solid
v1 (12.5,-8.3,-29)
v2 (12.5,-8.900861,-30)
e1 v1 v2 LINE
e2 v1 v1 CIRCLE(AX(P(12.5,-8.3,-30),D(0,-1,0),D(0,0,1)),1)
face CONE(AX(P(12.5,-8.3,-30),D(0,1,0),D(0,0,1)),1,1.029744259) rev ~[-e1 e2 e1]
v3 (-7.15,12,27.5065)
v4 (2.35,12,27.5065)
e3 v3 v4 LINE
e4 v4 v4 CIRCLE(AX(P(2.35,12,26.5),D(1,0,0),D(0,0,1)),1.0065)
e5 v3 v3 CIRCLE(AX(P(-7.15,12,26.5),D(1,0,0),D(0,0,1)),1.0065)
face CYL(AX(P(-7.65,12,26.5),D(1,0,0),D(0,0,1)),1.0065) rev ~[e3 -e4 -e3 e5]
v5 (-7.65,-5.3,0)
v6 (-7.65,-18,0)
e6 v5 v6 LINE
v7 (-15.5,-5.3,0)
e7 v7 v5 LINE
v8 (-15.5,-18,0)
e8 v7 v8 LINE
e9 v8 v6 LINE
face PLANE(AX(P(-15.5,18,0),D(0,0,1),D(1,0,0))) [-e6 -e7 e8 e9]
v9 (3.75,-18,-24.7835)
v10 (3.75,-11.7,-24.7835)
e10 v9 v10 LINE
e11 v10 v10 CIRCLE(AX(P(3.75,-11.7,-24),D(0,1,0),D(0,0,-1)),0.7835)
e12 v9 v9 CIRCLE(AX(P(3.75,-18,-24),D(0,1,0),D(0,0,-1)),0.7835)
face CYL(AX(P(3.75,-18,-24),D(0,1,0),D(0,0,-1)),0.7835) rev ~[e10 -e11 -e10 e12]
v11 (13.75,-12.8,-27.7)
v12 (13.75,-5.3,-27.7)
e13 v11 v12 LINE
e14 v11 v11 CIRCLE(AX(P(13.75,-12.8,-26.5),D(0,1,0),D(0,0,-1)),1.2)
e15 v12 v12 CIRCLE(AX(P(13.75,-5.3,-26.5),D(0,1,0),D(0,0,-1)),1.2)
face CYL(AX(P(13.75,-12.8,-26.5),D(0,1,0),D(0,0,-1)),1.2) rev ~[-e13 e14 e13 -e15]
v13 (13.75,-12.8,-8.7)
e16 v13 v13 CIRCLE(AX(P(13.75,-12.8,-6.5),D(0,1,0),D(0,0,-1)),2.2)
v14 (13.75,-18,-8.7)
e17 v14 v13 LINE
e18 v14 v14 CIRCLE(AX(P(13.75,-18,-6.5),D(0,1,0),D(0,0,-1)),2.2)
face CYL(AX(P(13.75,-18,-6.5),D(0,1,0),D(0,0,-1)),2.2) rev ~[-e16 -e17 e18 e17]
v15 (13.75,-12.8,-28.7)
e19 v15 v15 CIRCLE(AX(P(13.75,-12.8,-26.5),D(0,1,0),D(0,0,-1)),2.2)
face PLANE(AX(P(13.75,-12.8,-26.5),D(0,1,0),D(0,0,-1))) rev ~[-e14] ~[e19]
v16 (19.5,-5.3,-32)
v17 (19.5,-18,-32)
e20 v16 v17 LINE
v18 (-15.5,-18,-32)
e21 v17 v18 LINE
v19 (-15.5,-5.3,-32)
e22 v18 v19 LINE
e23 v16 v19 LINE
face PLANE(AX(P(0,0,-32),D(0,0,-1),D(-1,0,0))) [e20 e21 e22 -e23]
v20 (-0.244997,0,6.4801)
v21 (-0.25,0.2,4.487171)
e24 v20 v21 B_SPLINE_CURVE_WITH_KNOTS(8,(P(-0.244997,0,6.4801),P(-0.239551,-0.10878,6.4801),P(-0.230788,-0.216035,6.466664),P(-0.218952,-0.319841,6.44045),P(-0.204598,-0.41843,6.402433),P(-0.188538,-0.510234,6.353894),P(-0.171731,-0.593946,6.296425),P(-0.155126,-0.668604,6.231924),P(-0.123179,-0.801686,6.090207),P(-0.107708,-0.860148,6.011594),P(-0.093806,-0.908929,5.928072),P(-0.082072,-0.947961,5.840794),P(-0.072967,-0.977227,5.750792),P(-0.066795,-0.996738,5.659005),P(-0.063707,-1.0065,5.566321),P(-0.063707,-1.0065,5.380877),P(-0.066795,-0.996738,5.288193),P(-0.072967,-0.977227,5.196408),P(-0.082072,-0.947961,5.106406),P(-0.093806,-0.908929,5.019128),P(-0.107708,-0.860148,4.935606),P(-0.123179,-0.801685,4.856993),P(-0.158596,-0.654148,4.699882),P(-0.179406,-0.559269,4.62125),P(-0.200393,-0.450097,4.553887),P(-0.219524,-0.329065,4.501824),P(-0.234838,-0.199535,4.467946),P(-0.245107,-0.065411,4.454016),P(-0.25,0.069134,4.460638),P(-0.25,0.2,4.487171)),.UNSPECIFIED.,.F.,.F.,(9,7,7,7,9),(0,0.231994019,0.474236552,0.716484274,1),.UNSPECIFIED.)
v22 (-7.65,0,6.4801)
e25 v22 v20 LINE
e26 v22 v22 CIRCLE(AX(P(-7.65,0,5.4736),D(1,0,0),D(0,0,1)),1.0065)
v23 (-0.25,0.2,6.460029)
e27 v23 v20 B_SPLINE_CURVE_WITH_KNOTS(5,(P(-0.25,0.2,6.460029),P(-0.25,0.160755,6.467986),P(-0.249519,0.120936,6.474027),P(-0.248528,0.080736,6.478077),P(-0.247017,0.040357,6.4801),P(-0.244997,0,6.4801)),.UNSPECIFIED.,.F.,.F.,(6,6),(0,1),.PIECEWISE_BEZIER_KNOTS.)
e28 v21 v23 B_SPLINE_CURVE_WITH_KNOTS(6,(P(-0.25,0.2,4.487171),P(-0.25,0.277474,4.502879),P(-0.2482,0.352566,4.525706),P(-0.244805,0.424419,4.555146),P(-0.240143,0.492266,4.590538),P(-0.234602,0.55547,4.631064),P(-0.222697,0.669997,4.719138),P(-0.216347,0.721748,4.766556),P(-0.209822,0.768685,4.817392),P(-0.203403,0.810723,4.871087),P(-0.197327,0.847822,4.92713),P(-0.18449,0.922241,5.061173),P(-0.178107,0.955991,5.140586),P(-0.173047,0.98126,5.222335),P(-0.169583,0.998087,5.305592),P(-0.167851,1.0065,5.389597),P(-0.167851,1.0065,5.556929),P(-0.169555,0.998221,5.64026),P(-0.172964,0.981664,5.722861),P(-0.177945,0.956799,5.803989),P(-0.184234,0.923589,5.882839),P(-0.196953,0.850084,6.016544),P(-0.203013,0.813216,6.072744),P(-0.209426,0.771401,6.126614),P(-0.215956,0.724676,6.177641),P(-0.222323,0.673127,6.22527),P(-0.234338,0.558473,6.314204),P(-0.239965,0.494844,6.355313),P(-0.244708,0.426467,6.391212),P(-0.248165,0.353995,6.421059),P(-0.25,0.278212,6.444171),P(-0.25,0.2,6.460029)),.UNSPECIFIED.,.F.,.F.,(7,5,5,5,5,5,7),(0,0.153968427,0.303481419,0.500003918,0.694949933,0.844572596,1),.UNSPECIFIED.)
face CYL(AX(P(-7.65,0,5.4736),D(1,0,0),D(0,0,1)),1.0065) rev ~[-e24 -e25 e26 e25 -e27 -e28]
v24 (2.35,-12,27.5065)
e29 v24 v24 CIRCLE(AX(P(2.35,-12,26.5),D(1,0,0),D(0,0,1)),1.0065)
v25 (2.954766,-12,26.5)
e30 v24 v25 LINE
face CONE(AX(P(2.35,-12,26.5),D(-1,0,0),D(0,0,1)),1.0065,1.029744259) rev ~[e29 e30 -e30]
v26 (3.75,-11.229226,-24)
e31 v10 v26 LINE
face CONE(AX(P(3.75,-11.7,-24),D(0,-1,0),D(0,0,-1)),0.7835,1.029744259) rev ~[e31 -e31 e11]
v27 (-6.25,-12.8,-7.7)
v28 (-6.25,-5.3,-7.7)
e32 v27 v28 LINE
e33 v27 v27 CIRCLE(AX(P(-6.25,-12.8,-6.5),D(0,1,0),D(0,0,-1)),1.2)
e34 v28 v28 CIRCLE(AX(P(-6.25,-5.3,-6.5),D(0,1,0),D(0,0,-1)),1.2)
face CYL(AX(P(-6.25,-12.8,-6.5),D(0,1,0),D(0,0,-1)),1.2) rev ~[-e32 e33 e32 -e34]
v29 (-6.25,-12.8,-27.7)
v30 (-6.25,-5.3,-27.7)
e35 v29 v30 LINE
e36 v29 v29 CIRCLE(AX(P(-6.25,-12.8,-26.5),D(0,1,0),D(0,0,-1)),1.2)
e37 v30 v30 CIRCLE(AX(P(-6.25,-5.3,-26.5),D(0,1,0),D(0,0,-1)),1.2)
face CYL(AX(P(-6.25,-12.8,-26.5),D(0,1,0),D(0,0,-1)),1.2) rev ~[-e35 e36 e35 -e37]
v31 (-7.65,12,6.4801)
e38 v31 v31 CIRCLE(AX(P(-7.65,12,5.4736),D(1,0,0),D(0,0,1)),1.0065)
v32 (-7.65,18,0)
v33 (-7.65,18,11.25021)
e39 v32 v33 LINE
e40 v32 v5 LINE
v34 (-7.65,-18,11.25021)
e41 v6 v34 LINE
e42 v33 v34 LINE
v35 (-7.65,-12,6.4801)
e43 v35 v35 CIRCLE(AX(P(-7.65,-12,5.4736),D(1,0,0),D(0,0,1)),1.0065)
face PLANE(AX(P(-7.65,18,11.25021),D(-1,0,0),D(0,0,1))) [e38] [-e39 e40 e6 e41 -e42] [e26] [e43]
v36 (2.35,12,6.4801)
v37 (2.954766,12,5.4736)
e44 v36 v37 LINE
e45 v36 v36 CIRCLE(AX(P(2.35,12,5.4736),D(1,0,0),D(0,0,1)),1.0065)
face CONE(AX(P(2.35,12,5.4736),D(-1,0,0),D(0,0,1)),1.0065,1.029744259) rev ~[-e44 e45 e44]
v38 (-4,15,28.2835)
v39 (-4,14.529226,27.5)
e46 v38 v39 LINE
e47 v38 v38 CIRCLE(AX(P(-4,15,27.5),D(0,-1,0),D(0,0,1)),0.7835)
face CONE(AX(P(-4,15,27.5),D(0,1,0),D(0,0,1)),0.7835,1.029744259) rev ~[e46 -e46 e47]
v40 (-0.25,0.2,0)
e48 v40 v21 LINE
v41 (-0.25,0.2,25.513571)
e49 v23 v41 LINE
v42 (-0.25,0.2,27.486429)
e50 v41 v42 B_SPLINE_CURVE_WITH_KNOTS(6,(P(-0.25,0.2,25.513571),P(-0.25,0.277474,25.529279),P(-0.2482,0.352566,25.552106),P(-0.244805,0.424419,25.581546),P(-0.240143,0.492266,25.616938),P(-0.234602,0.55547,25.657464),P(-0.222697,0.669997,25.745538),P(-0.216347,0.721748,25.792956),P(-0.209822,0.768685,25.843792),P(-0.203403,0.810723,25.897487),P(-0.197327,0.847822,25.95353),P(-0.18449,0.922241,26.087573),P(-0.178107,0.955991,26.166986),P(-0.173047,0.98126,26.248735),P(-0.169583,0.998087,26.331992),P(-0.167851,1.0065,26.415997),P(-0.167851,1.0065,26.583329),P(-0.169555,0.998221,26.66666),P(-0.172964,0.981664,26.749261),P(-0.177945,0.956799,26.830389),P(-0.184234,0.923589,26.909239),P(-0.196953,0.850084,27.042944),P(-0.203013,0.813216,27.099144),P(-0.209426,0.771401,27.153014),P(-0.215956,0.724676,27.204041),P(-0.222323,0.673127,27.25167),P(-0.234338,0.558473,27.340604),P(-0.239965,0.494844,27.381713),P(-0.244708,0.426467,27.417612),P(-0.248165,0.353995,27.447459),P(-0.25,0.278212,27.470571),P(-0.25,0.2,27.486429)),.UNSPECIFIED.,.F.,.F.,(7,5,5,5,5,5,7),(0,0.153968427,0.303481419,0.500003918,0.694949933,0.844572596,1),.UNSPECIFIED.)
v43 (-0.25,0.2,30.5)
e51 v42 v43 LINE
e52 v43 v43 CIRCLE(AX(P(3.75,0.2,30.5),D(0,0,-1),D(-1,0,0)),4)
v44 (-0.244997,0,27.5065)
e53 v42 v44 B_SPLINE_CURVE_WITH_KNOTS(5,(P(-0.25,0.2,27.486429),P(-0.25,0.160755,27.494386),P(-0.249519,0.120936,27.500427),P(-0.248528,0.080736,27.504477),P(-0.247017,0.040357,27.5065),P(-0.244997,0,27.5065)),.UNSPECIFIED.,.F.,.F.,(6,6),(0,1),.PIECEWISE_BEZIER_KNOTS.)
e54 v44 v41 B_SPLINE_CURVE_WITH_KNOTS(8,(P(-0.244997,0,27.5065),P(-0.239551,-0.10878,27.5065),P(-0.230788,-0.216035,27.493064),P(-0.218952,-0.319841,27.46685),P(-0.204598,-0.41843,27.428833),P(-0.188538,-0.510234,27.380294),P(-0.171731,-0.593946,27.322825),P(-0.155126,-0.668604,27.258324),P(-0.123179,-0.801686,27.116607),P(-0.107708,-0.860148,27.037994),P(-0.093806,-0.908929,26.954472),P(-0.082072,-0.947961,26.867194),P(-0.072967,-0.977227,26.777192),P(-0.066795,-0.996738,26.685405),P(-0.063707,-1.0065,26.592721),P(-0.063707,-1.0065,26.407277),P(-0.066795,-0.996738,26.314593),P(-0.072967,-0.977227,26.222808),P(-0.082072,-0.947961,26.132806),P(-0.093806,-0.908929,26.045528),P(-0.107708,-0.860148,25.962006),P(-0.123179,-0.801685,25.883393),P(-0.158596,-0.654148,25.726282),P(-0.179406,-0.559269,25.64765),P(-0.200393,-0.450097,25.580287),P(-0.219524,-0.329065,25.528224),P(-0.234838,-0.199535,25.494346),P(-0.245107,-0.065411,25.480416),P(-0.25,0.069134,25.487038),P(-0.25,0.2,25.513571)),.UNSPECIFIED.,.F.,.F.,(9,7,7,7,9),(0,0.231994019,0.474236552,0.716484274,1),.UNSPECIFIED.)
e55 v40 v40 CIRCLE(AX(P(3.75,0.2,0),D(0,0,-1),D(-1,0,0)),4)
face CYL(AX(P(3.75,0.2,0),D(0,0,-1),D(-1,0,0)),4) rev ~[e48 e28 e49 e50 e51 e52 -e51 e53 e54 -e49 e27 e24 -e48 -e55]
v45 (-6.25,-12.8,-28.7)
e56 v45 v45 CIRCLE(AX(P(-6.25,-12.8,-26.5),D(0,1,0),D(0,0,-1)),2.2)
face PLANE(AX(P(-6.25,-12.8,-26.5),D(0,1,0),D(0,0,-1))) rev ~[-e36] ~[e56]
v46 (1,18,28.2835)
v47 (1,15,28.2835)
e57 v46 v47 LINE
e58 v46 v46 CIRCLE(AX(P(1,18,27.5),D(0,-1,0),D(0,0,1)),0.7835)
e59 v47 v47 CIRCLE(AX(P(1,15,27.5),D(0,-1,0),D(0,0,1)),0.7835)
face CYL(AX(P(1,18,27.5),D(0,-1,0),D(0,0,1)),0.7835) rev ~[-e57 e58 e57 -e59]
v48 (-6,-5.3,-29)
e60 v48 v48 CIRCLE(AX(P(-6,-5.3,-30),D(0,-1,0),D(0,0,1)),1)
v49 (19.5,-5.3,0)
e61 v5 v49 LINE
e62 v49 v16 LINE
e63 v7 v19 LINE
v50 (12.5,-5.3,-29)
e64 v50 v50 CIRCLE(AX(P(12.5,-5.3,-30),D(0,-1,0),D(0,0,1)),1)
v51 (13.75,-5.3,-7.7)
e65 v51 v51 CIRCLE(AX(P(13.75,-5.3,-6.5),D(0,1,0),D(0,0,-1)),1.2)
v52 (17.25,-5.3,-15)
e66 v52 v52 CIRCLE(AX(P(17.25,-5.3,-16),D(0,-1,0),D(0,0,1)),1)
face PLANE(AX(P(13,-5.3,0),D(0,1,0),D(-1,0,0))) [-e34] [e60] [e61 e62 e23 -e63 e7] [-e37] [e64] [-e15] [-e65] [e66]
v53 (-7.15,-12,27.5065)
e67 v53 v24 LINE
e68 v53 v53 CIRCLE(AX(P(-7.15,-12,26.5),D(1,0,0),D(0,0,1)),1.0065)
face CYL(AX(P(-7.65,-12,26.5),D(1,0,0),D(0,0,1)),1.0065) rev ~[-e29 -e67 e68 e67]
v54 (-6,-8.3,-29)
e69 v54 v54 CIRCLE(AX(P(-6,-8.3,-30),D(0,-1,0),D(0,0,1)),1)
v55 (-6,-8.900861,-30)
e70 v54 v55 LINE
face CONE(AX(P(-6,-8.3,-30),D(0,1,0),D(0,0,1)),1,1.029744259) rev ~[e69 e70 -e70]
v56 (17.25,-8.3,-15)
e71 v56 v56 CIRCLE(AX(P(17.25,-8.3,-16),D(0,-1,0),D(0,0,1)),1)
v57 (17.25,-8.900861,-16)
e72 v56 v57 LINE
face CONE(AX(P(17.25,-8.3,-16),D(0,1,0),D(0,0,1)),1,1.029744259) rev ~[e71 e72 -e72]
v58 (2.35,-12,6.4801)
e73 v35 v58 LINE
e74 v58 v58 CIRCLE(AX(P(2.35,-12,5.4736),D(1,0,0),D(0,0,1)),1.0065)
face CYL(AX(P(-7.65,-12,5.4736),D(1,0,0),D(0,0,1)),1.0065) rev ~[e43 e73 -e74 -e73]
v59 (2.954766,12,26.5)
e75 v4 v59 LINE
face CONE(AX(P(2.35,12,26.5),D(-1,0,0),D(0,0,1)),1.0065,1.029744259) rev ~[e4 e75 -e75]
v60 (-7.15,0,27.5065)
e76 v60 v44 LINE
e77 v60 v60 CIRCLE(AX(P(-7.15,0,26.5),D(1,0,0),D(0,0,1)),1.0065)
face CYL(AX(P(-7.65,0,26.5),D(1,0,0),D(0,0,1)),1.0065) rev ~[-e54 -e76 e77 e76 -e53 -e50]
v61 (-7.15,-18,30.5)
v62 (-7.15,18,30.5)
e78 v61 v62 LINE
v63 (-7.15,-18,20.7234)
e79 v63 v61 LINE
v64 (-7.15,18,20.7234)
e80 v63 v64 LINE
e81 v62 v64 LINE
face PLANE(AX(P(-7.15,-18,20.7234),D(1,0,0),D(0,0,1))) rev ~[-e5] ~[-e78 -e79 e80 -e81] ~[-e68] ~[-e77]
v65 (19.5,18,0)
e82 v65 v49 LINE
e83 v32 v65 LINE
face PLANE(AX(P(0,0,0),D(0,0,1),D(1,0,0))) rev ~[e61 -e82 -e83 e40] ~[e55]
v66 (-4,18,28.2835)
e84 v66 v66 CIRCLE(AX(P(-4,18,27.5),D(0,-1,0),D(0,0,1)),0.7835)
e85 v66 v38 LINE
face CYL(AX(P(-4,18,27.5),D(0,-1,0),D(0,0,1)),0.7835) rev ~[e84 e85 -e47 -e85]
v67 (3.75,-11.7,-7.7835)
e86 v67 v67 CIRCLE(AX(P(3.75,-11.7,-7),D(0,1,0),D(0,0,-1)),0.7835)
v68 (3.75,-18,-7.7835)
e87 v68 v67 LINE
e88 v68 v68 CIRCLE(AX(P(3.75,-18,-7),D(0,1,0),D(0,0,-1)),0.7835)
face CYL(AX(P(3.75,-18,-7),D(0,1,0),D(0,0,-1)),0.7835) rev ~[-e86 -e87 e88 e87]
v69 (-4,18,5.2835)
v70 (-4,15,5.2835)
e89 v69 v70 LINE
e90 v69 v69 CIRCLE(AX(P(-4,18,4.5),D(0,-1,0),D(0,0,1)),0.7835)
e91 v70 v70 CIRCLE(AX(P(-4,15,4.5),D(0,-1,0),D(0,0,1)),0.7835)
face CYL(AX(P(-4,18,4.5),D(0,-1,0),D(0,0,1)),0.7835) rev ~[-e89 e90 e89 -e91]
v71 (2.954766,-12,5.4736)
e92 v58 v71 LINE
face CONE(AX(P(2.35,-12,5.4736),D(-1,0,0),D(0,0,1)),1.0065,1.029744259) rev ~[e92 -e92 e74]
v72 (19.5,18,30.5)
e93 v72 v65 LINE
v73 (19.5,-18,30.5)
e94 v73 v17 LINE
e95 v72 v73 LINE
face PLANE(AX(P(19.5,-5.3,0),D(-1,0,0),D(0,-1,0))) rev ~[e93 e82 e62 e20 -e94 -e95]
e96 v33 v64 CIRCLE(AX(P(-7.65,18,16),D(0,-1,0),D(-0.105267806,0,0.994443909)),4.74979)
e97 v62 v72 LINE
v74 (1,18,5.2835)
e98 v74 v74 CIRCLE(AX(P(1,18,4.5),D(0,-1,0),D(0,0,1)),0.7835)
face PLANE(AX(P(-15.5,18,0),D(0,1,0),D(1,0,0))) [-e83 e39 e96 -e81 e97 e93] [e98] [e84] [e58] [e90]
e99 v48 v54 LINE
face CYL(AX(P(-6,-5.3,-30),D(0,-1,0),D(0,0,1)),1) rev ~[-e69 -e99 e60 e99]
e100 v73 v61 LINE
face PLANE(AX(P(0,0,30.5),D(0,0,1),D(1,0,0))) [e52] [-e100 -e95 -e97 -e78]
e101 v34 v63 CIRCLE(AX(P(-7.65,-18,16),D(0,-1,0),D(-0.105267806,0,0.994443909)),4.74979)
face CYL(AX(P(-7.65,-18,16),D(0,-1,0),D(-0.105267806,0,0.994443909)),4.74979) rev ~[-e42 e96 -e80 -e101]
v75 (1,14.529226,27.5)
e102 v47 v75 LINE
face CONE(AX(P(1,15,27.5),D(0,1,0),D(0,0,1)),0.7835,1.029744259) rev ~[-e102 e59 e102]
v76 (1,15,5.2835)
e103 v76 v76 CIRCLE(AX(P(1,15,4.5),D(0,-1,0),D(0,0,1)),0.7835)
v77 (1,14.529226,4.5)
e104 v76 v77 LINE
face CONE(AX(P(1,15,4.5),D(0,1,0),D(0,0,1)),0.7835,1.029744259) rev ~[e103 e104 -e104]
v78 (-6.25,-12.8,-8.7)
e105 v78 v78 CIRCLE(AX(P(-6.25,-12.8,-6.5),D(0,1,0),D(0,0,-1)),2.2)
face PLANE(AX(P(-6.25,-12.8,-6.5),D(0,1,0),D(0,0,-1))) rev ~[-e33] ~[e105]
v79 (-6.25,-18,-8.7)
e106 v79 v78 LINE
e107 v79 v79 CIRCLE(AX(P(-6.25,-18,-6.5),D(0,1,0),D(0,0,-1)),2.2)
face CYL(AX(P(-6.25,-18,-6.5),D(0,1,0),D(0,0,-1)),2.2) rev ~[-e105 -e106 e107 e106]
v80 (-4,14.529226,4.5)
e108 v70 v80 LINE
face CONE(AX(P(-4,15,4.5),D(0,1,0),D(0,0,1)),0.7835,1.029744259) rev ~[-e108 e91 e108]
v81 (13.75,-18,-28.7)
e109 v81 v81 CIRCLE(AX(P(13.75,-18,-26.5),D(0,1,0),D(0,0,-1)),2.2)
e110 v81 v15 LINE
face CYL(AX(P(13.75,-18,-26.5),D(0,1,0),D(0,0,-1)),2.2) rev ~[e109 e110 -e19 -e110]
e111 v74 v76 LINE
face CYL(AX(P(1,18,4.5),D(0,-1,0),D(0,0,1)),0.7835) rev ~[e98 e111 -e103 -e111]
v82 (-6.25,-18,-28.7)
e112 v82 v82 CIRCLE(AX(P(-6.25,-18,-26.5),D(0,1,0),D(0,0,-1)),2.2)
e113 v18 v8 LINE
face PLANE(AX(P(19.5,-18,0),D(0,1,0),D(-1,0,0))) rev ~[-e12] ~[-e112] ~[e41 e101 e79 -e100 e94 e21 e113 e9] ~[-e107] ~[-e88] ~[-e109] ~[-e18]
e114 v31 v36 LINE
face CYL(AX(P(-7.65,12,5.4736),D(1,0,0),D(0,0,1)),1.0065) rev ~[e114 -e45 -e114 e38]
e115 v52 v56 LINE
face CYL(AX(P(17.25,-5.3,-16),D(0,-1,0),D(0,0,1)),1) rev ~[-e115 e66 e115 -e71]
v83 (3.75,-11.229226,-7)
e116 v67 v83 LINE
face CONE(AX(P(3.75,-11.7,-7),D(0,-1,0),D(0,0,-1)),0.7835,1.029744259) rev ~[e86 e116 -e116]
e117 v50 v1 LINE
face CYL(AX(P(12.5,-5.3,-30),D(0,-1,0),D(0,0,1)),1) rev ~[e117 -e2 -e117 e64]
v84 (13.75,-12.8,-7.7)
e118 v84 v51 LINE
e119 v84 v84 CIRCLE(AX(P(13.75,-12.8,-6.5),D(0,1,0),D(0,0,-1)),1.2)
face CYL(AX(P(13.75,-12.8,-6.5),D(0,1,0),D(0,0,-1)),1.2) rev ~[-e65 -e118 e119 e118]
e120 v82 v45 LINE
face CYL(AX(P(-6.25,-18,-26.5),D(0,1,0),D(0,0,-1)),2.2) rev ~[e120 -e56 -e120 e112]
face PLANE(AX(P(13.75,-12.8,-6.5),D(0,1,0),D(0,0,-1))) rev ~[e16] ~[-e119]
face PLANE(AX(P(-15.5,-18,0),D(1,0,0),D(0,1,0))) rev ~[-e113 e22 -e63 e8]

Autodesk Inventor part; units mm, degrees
ref_plane "YZ Plane" through (0, 0, 0) normal (1, 0, 0) x (0, 1, 0)
ref_plane "XZ Plane" through (0, 0, 0) normal (0, 1, 0) x (-1, 0, 0)
ref_plane "XY Plane" through (0, 0, 0) normal (0, 0, 1) x (1, 0, 0)
sketch "Sketch1" plane through (0, 0, 0) normal (0, 0, 1) x (1, 0, 0)
  line L0 (-15.5, 18) -> (19.5, 18)
  line L1 (19.5, 18) -> (19.5, -18)
  line L2 (19.5, -18) -> (-15.5, -18)
  line L3 (-15.5, -18) -> (-15.5, 18)
  point P0 (0, 0)
  dimension "d0" = 35
  dimension "d1" = 36
  dimension "d2" = 18
  dimension "d3" = 15.5
extrude "Extrusion1" add sketch "Sketch1" along normal blind 8
sketch "Sketch2" plane through (0, 0, 8) normal (0, 0, 1) x (1, 0, 0)
  line L0 (-15.5, 18) -> (19.5, 18)
  line L1 (19.5, 18) -> (19.5, -18)
  line L2 (19.5, -18) -> (-15.5, -18)
  line L3 (-15.5, -18) -> (-15.5, 18)
  line L4 (-15.5, -18) -> (-15.5, 18) projected
  line L5 (19.5, 18) -> (19.5, -18) projected
  line L6 (-15.5, 18) -> (19.5, 18) projected
  line L7 (19.5, -18) -> (-15.5, -18) projected
  line L8 (19.5, -18) -> (19.5, 18)
  point P0 (0, 0)
  dimension "d70" = 0
  dimension "d165" = 0
extrude "Extrusion2" add sketch "Sketch2" along normal blind 22.5
sketch "Sketch3" plane through (-15.5, -18, 0) normal (0, -1, 0) x (1, 0, 0)
  line L0 (7.85, 30.5) -> (7.35, 30.5)
  line L1 (7.85, 30.5) -> (8.35, 30.5)
  line L2 (35, 0) -> (0, 0) projected
  arc A0 (7.35, 20.7234) -> (8.35, 20.7234) centre (7.85, 16) ccw
  line L3 (7.35, 30.5) -> (7.35, 20.7234)
  line L4 (8.35, 30.5) -> (8.35, 20.7234)
  line L5 (35, 0) -> (35, 30.5) projected
  line L6 (35, 30.5) -> (0, 30.5) projected
  line L7 (0, 0) -> (0, 30.5) projected
  point P0 (15.5, 0)
  dimension "d16" = 0.5
  dimension "d17" = 0.5
  dimension "d63" = 9.4996
  dimension "d65" = 16
  dimension "d105" = 1
  dimension "d188" = 7.85
  dimension "d189" = 0.5
emboss "Emboss1" sketch "Sketch3" operation cut depth 50 direction (0, 1, 0) contours L1 L4 A0 L3 L0
sketch "Sketch13" plane through (0, 0, 0) normal (0, 0, -1) x (-1, 0, 0)
  line L0 (-13, -5.3) -> (11, -5.3)
  line L1 (15.5, 18) -> (-19.5, 18) projected
  line L2 (-19.5, 18) -> (-19.5, -18) projected
  line L3 (-19.5, -18) -> (15.5, -18) projected
  line L4 (15.5, -18) -> (15.5, 18) projected
  line L5 (-19.5, 18) -> (-19.5, -18) projected
  line L6 (-19.5, -5.3) -> (15.5, -5.3)
  point P0 (0, 0)
  dimension "d190" = 12.7
extrude "Extrusion5" add sketch "Sketch13" along normal blind 32 contours L0 L6 L4 L3 L2
sketch "Sketch14" plane through (-15.5, -5.3, 0) normal (0, 1, 0) x (1, 0, 0)
  line L0 (0, 32) -> (35, 32) projected
  line L1 (35, 0) -> (35, 32) projected
  point P0 (15.5, 0)
  point P1 (9.5, 30)
  point P2 (28, 30)
  point P3 (32.75, 16)
  dimension "d109" = 2
  dimension "d110" = 2
  dimension "d111" = 2.25
  dimension "d112" = 9.5
  dimension "d113" = 7
  dimension "d114" = 16
hole "Press fit for D2mm_L5mm Dowel - pin to protrude 2mm" at (-6, -5.3, -30) at (12.5, -5.3, -30) at (17.25, -5.3, -16) direction (0, -1, 0) diameter 2 depth 3 tip angle 118
sketch "Sketch21" plane through (0, 0, 0) normal (0, 0, -1) x (-1, 0, 0)
  circle A0 centre (-3.75, 0.2) radius 4
  circle A1 centre (-3.75, 0.2) radius 3 construction
  point P0 (0, 0)
  dimension "d185" = 8
extrude "Extrusion6" cut sketch "Sketch21" against normal through all
sketch "Sketch22" plane through (-15.5, -18, 30.5) normal (-1, 0, 0) x (0, 0, 1)
  line L0 (-30.5, 36) -> (0, 36) projected
  line L1 (-30.5, 12.7) -> (-30.5, 36) projected
  line L2 (-30.5, 12.7) -> (-62.5, 12.7) projected
  line L3 (-62.5, 0) -> (-62.5, 12.7) projected
  line L4 (0, 0) -> (-62.5, 0) projected
  line L5 (0, 0) -> (0, 36) projected
  point P0 (-30.5, 18)
  point P1 (-4, 30)
  point P2 (-4, 18)
  point P3 (-4, 6)
  dimension "d191" = 4
  dimension "d192" = 4
  dimension "d193" = 4
  dimension "d194" = 6
  dimension "d195" = 6
  dimension "d196" = 18
hole "CBore for M2.5 screw" [suppressed]
sketch "Sketch24" plane through (-7.65, -18, 16) normal (0, -1, 0) x (1, 0, 0)
  circle A0 centre (21.4, -42.5) radius 0.7835
  circle A1 centre (21.4, -22.5) radius 0.7835
  circle A2 centre (1.4, -42.5) radius 0.7835
  circle A3 centre (1.4, -22.5) radius 0.7835
  point P0 (7.65, -16)
hole "CBore for M2 screw" at (-6.25, -18, -6.5) at (13.75, -18, -6.5) at (13.75, -18, -26.5) at (-6.25, -18, -26.5) direction (0, 1, 0) diameter 2.4 end through all counterbore diameter 4.4 counterbore depth 5.2 clearance for "Socket Head Cap Screw" size "M2" standard "Ansi Metric M Profile"
sketch "Sketch25" plane through (-7.65, -18, 16) normal (0, -1, 0) x (1, 0, 0)
  circle A0 centre (21.4, -42.5) radius 2.2 projected
  circle A1 centre (1.4, -22.5) radius 2.2 projected
  circle A2 centre (21.4, -22.5) radius 2.2 projected
  circle A3 centre (1.4, -42.5) radius 2.2 projected
  line L0 (-0.5, 4.7234) -> (-0.5, 14.5) projected
  line L1 (-0.5, 14.5) -> (-7.85, 14.5) projected
  line L2 (-7.85, 14.5) -> (-7.85, -48) projected
  line L3 (27.15, -48) -> (-7.85, -48) projected
  line L4 (27.15, 14.5) -> (27.15, -48) projected
  line L5 (27.15, 14.5) -> (0.5, 14.5) projected
  line L6 (0.5, 14.5) -> (0.5, 4.7234) projected
  arc A4 (-0.5, 4.7234) -> (0.5, 4.7234) centre (0, 0) ccw projected
  line L7 (27.15, -48) -> (-7.85, -48) projected
  circle A5 centre (1.4, -42.5) radius 2.2 projected
  circle A6 centre (21.4, -42.5) radius 1.2 projected
  line L8 (1.4, -42.5) -> (21.4, -42.5) construction
  line L9 (11.4, -42.5) -> (11.4, 14.5) construction
  line L10 (0.5, 14.5) -> (27.15, 14.5) projected
  point P0 (7.65, -16)
  point P1 (11.4, -23)
  point P2 (11.4, -40)
  dimension "d218" = 8
  dimension "d219" = 25
hole "Threaded hole for M2 screw" at (3.75, -18, -7) at (3.75, -18, -24) direction (0, 1, 0) diameter 1.567 depth 6.3 tip angle 118 thread size "M2x0.4" class "6H" standard "ANSI Metric M Profile"
sketch "Sketch27" plane through (-15.5, 18, 0) normal (0, 1, 0) x (1, 0, 0)
  arc A0 (8.35, -20.7234) -> (7.35, -20.7234) centre (7.85, -16) ccw projected
  line L0 (7.35, -30.5) -> (7.35, -20.7234) projected
  arc A1 (8.35, -20.7234) -> (7.35, -20.7234) centre (7.85, -16) ccw projected
  line L1 (8.35, -20.7234) -> (8.35, -30.5) projected
  line L2 (8.35, -30.5) -> (35, -30.5) projected
  line L3 (35, 0) -> (35, -30.5) projected
  line L4 (0, 0) -> (35, 0) projected
  line L5 (0, 0) -> (0, -30.5) projected
  line L6 (0, -30.5) -> (7.35, -30.5) projected
  line L7 (7.85, -16) -> (7.85, -30.5)
  line L8 (7.85, -30.5) -> (0, -30.5)
  line L9 (0, -30.5) -> (0, 0)
  line L10 (0, 0) -> (7.85, 0)
  line L11 (7.85, 0) -> (7.85, -16)
  point P0 (15.5, 0)
extrude "Extrusion7" cut sketch "Sketch27" against normal through all contours L11 L7 L8 L0 A0 | A0 L0 L6 L5 L4 L11
sketch "Sketch23" plane through (-7.65, -18, 20.7234) normal (-1, 0, 0) x (0, 0, 1)
  line L0 (0, 0) -> (-9.4732, 0) construction
  line L1 (-9.4732, 36) -> (0, 36) construction
  line L2 (-4.7366, 0) -> (-4.7366, 36) construction
  point P0 (-20.7234, 18)
  point P1 (5.7766, 30)
  point P2 (5.7766, 18)
  point P3 (5.7766, 6)
  point P4 (-15.2498, 30)
  point P5 (-15.2498, 18)
  point P6 (-15.2498, 6)
  point P7 (5.7766, 30)
  point P8 (5.7766, 18)
  point P9 (5.7766, 6)
  dimension "d227" = 10.5132
  dimension "d228" = 10.5132
  dimension "d229" = 10.5132
  dimension "d230" = 10.5132
  dimension "d231" = 10.5132
  dimension "d232" = 10.5132
  dimension "d233" = 6
  dimension "d234" = 6
  dimension "d235" = 18
  dimension "d236" = 30
  dimension "d237" = 18
  dimension "d238" = 30
hole "Threaded hole for M2.5 screw" at (-7.65, 12, 26.5) at (-7.65, 0, 26.5) at (-7.65, -12, 26.5) at (-7.65, 12, 5.4736) at (-7.65, 0, 5.4736) at (-7.65, -12, 5.4736) direction (1, 0, 0) diameter 2.013 depth 10 tip angle 118 thread size "M2.5x0.45" class "6H" standard "ANSI Metric M Profile"
sketch "Sketch29" plane through (19.5, 18, 30.5) normal (0, 1, 0) x (1, 0, 0)
  arc A0 (-26.65, 9.7766) -> (-27.15, 19.2498) centre (-27.15, 14.5) ccw projected
  point P0 (-19.5, 30.5)
  point P1 (-23.5, 3)
  point P2 (-18.5, 3)
  point P3 (-23.5, 26)
  point P4 (-18.5, 26)
  dimension "d241" = 11.5
  dimension "d242" = 11.5
  dimension "d243" = 11.5
  dimension "d244" = 11.5
  dimension "d245" = 3.65
  dimension "d246" = 3.65
  dimension "d247" = 8.65
  dimension "d248" = 8.65
hole "Hole18" at (-4, 18, 27.5) at (1, 18, 27.5) at (-4, 18, 4.5) at (1, 18, 4.5) direction (0, -1, 0) diameter 1.567 depth 3 tip angle 118 thread size "M2x0.4" class "6H" standard "ANSI Metric M Profile"
equation "\"d2\" = 0.5 * d1"
equation "\"d230\" = d229"
equation "\"d231\" = d228"
equation "\"d232\" = d227"
equation "\"d233\" = d234"
equation "\"d237\" = d235"
equation "\"d238\" = d236"
properties part number "J007526" material "ALUMINUM, 6061-T651"
